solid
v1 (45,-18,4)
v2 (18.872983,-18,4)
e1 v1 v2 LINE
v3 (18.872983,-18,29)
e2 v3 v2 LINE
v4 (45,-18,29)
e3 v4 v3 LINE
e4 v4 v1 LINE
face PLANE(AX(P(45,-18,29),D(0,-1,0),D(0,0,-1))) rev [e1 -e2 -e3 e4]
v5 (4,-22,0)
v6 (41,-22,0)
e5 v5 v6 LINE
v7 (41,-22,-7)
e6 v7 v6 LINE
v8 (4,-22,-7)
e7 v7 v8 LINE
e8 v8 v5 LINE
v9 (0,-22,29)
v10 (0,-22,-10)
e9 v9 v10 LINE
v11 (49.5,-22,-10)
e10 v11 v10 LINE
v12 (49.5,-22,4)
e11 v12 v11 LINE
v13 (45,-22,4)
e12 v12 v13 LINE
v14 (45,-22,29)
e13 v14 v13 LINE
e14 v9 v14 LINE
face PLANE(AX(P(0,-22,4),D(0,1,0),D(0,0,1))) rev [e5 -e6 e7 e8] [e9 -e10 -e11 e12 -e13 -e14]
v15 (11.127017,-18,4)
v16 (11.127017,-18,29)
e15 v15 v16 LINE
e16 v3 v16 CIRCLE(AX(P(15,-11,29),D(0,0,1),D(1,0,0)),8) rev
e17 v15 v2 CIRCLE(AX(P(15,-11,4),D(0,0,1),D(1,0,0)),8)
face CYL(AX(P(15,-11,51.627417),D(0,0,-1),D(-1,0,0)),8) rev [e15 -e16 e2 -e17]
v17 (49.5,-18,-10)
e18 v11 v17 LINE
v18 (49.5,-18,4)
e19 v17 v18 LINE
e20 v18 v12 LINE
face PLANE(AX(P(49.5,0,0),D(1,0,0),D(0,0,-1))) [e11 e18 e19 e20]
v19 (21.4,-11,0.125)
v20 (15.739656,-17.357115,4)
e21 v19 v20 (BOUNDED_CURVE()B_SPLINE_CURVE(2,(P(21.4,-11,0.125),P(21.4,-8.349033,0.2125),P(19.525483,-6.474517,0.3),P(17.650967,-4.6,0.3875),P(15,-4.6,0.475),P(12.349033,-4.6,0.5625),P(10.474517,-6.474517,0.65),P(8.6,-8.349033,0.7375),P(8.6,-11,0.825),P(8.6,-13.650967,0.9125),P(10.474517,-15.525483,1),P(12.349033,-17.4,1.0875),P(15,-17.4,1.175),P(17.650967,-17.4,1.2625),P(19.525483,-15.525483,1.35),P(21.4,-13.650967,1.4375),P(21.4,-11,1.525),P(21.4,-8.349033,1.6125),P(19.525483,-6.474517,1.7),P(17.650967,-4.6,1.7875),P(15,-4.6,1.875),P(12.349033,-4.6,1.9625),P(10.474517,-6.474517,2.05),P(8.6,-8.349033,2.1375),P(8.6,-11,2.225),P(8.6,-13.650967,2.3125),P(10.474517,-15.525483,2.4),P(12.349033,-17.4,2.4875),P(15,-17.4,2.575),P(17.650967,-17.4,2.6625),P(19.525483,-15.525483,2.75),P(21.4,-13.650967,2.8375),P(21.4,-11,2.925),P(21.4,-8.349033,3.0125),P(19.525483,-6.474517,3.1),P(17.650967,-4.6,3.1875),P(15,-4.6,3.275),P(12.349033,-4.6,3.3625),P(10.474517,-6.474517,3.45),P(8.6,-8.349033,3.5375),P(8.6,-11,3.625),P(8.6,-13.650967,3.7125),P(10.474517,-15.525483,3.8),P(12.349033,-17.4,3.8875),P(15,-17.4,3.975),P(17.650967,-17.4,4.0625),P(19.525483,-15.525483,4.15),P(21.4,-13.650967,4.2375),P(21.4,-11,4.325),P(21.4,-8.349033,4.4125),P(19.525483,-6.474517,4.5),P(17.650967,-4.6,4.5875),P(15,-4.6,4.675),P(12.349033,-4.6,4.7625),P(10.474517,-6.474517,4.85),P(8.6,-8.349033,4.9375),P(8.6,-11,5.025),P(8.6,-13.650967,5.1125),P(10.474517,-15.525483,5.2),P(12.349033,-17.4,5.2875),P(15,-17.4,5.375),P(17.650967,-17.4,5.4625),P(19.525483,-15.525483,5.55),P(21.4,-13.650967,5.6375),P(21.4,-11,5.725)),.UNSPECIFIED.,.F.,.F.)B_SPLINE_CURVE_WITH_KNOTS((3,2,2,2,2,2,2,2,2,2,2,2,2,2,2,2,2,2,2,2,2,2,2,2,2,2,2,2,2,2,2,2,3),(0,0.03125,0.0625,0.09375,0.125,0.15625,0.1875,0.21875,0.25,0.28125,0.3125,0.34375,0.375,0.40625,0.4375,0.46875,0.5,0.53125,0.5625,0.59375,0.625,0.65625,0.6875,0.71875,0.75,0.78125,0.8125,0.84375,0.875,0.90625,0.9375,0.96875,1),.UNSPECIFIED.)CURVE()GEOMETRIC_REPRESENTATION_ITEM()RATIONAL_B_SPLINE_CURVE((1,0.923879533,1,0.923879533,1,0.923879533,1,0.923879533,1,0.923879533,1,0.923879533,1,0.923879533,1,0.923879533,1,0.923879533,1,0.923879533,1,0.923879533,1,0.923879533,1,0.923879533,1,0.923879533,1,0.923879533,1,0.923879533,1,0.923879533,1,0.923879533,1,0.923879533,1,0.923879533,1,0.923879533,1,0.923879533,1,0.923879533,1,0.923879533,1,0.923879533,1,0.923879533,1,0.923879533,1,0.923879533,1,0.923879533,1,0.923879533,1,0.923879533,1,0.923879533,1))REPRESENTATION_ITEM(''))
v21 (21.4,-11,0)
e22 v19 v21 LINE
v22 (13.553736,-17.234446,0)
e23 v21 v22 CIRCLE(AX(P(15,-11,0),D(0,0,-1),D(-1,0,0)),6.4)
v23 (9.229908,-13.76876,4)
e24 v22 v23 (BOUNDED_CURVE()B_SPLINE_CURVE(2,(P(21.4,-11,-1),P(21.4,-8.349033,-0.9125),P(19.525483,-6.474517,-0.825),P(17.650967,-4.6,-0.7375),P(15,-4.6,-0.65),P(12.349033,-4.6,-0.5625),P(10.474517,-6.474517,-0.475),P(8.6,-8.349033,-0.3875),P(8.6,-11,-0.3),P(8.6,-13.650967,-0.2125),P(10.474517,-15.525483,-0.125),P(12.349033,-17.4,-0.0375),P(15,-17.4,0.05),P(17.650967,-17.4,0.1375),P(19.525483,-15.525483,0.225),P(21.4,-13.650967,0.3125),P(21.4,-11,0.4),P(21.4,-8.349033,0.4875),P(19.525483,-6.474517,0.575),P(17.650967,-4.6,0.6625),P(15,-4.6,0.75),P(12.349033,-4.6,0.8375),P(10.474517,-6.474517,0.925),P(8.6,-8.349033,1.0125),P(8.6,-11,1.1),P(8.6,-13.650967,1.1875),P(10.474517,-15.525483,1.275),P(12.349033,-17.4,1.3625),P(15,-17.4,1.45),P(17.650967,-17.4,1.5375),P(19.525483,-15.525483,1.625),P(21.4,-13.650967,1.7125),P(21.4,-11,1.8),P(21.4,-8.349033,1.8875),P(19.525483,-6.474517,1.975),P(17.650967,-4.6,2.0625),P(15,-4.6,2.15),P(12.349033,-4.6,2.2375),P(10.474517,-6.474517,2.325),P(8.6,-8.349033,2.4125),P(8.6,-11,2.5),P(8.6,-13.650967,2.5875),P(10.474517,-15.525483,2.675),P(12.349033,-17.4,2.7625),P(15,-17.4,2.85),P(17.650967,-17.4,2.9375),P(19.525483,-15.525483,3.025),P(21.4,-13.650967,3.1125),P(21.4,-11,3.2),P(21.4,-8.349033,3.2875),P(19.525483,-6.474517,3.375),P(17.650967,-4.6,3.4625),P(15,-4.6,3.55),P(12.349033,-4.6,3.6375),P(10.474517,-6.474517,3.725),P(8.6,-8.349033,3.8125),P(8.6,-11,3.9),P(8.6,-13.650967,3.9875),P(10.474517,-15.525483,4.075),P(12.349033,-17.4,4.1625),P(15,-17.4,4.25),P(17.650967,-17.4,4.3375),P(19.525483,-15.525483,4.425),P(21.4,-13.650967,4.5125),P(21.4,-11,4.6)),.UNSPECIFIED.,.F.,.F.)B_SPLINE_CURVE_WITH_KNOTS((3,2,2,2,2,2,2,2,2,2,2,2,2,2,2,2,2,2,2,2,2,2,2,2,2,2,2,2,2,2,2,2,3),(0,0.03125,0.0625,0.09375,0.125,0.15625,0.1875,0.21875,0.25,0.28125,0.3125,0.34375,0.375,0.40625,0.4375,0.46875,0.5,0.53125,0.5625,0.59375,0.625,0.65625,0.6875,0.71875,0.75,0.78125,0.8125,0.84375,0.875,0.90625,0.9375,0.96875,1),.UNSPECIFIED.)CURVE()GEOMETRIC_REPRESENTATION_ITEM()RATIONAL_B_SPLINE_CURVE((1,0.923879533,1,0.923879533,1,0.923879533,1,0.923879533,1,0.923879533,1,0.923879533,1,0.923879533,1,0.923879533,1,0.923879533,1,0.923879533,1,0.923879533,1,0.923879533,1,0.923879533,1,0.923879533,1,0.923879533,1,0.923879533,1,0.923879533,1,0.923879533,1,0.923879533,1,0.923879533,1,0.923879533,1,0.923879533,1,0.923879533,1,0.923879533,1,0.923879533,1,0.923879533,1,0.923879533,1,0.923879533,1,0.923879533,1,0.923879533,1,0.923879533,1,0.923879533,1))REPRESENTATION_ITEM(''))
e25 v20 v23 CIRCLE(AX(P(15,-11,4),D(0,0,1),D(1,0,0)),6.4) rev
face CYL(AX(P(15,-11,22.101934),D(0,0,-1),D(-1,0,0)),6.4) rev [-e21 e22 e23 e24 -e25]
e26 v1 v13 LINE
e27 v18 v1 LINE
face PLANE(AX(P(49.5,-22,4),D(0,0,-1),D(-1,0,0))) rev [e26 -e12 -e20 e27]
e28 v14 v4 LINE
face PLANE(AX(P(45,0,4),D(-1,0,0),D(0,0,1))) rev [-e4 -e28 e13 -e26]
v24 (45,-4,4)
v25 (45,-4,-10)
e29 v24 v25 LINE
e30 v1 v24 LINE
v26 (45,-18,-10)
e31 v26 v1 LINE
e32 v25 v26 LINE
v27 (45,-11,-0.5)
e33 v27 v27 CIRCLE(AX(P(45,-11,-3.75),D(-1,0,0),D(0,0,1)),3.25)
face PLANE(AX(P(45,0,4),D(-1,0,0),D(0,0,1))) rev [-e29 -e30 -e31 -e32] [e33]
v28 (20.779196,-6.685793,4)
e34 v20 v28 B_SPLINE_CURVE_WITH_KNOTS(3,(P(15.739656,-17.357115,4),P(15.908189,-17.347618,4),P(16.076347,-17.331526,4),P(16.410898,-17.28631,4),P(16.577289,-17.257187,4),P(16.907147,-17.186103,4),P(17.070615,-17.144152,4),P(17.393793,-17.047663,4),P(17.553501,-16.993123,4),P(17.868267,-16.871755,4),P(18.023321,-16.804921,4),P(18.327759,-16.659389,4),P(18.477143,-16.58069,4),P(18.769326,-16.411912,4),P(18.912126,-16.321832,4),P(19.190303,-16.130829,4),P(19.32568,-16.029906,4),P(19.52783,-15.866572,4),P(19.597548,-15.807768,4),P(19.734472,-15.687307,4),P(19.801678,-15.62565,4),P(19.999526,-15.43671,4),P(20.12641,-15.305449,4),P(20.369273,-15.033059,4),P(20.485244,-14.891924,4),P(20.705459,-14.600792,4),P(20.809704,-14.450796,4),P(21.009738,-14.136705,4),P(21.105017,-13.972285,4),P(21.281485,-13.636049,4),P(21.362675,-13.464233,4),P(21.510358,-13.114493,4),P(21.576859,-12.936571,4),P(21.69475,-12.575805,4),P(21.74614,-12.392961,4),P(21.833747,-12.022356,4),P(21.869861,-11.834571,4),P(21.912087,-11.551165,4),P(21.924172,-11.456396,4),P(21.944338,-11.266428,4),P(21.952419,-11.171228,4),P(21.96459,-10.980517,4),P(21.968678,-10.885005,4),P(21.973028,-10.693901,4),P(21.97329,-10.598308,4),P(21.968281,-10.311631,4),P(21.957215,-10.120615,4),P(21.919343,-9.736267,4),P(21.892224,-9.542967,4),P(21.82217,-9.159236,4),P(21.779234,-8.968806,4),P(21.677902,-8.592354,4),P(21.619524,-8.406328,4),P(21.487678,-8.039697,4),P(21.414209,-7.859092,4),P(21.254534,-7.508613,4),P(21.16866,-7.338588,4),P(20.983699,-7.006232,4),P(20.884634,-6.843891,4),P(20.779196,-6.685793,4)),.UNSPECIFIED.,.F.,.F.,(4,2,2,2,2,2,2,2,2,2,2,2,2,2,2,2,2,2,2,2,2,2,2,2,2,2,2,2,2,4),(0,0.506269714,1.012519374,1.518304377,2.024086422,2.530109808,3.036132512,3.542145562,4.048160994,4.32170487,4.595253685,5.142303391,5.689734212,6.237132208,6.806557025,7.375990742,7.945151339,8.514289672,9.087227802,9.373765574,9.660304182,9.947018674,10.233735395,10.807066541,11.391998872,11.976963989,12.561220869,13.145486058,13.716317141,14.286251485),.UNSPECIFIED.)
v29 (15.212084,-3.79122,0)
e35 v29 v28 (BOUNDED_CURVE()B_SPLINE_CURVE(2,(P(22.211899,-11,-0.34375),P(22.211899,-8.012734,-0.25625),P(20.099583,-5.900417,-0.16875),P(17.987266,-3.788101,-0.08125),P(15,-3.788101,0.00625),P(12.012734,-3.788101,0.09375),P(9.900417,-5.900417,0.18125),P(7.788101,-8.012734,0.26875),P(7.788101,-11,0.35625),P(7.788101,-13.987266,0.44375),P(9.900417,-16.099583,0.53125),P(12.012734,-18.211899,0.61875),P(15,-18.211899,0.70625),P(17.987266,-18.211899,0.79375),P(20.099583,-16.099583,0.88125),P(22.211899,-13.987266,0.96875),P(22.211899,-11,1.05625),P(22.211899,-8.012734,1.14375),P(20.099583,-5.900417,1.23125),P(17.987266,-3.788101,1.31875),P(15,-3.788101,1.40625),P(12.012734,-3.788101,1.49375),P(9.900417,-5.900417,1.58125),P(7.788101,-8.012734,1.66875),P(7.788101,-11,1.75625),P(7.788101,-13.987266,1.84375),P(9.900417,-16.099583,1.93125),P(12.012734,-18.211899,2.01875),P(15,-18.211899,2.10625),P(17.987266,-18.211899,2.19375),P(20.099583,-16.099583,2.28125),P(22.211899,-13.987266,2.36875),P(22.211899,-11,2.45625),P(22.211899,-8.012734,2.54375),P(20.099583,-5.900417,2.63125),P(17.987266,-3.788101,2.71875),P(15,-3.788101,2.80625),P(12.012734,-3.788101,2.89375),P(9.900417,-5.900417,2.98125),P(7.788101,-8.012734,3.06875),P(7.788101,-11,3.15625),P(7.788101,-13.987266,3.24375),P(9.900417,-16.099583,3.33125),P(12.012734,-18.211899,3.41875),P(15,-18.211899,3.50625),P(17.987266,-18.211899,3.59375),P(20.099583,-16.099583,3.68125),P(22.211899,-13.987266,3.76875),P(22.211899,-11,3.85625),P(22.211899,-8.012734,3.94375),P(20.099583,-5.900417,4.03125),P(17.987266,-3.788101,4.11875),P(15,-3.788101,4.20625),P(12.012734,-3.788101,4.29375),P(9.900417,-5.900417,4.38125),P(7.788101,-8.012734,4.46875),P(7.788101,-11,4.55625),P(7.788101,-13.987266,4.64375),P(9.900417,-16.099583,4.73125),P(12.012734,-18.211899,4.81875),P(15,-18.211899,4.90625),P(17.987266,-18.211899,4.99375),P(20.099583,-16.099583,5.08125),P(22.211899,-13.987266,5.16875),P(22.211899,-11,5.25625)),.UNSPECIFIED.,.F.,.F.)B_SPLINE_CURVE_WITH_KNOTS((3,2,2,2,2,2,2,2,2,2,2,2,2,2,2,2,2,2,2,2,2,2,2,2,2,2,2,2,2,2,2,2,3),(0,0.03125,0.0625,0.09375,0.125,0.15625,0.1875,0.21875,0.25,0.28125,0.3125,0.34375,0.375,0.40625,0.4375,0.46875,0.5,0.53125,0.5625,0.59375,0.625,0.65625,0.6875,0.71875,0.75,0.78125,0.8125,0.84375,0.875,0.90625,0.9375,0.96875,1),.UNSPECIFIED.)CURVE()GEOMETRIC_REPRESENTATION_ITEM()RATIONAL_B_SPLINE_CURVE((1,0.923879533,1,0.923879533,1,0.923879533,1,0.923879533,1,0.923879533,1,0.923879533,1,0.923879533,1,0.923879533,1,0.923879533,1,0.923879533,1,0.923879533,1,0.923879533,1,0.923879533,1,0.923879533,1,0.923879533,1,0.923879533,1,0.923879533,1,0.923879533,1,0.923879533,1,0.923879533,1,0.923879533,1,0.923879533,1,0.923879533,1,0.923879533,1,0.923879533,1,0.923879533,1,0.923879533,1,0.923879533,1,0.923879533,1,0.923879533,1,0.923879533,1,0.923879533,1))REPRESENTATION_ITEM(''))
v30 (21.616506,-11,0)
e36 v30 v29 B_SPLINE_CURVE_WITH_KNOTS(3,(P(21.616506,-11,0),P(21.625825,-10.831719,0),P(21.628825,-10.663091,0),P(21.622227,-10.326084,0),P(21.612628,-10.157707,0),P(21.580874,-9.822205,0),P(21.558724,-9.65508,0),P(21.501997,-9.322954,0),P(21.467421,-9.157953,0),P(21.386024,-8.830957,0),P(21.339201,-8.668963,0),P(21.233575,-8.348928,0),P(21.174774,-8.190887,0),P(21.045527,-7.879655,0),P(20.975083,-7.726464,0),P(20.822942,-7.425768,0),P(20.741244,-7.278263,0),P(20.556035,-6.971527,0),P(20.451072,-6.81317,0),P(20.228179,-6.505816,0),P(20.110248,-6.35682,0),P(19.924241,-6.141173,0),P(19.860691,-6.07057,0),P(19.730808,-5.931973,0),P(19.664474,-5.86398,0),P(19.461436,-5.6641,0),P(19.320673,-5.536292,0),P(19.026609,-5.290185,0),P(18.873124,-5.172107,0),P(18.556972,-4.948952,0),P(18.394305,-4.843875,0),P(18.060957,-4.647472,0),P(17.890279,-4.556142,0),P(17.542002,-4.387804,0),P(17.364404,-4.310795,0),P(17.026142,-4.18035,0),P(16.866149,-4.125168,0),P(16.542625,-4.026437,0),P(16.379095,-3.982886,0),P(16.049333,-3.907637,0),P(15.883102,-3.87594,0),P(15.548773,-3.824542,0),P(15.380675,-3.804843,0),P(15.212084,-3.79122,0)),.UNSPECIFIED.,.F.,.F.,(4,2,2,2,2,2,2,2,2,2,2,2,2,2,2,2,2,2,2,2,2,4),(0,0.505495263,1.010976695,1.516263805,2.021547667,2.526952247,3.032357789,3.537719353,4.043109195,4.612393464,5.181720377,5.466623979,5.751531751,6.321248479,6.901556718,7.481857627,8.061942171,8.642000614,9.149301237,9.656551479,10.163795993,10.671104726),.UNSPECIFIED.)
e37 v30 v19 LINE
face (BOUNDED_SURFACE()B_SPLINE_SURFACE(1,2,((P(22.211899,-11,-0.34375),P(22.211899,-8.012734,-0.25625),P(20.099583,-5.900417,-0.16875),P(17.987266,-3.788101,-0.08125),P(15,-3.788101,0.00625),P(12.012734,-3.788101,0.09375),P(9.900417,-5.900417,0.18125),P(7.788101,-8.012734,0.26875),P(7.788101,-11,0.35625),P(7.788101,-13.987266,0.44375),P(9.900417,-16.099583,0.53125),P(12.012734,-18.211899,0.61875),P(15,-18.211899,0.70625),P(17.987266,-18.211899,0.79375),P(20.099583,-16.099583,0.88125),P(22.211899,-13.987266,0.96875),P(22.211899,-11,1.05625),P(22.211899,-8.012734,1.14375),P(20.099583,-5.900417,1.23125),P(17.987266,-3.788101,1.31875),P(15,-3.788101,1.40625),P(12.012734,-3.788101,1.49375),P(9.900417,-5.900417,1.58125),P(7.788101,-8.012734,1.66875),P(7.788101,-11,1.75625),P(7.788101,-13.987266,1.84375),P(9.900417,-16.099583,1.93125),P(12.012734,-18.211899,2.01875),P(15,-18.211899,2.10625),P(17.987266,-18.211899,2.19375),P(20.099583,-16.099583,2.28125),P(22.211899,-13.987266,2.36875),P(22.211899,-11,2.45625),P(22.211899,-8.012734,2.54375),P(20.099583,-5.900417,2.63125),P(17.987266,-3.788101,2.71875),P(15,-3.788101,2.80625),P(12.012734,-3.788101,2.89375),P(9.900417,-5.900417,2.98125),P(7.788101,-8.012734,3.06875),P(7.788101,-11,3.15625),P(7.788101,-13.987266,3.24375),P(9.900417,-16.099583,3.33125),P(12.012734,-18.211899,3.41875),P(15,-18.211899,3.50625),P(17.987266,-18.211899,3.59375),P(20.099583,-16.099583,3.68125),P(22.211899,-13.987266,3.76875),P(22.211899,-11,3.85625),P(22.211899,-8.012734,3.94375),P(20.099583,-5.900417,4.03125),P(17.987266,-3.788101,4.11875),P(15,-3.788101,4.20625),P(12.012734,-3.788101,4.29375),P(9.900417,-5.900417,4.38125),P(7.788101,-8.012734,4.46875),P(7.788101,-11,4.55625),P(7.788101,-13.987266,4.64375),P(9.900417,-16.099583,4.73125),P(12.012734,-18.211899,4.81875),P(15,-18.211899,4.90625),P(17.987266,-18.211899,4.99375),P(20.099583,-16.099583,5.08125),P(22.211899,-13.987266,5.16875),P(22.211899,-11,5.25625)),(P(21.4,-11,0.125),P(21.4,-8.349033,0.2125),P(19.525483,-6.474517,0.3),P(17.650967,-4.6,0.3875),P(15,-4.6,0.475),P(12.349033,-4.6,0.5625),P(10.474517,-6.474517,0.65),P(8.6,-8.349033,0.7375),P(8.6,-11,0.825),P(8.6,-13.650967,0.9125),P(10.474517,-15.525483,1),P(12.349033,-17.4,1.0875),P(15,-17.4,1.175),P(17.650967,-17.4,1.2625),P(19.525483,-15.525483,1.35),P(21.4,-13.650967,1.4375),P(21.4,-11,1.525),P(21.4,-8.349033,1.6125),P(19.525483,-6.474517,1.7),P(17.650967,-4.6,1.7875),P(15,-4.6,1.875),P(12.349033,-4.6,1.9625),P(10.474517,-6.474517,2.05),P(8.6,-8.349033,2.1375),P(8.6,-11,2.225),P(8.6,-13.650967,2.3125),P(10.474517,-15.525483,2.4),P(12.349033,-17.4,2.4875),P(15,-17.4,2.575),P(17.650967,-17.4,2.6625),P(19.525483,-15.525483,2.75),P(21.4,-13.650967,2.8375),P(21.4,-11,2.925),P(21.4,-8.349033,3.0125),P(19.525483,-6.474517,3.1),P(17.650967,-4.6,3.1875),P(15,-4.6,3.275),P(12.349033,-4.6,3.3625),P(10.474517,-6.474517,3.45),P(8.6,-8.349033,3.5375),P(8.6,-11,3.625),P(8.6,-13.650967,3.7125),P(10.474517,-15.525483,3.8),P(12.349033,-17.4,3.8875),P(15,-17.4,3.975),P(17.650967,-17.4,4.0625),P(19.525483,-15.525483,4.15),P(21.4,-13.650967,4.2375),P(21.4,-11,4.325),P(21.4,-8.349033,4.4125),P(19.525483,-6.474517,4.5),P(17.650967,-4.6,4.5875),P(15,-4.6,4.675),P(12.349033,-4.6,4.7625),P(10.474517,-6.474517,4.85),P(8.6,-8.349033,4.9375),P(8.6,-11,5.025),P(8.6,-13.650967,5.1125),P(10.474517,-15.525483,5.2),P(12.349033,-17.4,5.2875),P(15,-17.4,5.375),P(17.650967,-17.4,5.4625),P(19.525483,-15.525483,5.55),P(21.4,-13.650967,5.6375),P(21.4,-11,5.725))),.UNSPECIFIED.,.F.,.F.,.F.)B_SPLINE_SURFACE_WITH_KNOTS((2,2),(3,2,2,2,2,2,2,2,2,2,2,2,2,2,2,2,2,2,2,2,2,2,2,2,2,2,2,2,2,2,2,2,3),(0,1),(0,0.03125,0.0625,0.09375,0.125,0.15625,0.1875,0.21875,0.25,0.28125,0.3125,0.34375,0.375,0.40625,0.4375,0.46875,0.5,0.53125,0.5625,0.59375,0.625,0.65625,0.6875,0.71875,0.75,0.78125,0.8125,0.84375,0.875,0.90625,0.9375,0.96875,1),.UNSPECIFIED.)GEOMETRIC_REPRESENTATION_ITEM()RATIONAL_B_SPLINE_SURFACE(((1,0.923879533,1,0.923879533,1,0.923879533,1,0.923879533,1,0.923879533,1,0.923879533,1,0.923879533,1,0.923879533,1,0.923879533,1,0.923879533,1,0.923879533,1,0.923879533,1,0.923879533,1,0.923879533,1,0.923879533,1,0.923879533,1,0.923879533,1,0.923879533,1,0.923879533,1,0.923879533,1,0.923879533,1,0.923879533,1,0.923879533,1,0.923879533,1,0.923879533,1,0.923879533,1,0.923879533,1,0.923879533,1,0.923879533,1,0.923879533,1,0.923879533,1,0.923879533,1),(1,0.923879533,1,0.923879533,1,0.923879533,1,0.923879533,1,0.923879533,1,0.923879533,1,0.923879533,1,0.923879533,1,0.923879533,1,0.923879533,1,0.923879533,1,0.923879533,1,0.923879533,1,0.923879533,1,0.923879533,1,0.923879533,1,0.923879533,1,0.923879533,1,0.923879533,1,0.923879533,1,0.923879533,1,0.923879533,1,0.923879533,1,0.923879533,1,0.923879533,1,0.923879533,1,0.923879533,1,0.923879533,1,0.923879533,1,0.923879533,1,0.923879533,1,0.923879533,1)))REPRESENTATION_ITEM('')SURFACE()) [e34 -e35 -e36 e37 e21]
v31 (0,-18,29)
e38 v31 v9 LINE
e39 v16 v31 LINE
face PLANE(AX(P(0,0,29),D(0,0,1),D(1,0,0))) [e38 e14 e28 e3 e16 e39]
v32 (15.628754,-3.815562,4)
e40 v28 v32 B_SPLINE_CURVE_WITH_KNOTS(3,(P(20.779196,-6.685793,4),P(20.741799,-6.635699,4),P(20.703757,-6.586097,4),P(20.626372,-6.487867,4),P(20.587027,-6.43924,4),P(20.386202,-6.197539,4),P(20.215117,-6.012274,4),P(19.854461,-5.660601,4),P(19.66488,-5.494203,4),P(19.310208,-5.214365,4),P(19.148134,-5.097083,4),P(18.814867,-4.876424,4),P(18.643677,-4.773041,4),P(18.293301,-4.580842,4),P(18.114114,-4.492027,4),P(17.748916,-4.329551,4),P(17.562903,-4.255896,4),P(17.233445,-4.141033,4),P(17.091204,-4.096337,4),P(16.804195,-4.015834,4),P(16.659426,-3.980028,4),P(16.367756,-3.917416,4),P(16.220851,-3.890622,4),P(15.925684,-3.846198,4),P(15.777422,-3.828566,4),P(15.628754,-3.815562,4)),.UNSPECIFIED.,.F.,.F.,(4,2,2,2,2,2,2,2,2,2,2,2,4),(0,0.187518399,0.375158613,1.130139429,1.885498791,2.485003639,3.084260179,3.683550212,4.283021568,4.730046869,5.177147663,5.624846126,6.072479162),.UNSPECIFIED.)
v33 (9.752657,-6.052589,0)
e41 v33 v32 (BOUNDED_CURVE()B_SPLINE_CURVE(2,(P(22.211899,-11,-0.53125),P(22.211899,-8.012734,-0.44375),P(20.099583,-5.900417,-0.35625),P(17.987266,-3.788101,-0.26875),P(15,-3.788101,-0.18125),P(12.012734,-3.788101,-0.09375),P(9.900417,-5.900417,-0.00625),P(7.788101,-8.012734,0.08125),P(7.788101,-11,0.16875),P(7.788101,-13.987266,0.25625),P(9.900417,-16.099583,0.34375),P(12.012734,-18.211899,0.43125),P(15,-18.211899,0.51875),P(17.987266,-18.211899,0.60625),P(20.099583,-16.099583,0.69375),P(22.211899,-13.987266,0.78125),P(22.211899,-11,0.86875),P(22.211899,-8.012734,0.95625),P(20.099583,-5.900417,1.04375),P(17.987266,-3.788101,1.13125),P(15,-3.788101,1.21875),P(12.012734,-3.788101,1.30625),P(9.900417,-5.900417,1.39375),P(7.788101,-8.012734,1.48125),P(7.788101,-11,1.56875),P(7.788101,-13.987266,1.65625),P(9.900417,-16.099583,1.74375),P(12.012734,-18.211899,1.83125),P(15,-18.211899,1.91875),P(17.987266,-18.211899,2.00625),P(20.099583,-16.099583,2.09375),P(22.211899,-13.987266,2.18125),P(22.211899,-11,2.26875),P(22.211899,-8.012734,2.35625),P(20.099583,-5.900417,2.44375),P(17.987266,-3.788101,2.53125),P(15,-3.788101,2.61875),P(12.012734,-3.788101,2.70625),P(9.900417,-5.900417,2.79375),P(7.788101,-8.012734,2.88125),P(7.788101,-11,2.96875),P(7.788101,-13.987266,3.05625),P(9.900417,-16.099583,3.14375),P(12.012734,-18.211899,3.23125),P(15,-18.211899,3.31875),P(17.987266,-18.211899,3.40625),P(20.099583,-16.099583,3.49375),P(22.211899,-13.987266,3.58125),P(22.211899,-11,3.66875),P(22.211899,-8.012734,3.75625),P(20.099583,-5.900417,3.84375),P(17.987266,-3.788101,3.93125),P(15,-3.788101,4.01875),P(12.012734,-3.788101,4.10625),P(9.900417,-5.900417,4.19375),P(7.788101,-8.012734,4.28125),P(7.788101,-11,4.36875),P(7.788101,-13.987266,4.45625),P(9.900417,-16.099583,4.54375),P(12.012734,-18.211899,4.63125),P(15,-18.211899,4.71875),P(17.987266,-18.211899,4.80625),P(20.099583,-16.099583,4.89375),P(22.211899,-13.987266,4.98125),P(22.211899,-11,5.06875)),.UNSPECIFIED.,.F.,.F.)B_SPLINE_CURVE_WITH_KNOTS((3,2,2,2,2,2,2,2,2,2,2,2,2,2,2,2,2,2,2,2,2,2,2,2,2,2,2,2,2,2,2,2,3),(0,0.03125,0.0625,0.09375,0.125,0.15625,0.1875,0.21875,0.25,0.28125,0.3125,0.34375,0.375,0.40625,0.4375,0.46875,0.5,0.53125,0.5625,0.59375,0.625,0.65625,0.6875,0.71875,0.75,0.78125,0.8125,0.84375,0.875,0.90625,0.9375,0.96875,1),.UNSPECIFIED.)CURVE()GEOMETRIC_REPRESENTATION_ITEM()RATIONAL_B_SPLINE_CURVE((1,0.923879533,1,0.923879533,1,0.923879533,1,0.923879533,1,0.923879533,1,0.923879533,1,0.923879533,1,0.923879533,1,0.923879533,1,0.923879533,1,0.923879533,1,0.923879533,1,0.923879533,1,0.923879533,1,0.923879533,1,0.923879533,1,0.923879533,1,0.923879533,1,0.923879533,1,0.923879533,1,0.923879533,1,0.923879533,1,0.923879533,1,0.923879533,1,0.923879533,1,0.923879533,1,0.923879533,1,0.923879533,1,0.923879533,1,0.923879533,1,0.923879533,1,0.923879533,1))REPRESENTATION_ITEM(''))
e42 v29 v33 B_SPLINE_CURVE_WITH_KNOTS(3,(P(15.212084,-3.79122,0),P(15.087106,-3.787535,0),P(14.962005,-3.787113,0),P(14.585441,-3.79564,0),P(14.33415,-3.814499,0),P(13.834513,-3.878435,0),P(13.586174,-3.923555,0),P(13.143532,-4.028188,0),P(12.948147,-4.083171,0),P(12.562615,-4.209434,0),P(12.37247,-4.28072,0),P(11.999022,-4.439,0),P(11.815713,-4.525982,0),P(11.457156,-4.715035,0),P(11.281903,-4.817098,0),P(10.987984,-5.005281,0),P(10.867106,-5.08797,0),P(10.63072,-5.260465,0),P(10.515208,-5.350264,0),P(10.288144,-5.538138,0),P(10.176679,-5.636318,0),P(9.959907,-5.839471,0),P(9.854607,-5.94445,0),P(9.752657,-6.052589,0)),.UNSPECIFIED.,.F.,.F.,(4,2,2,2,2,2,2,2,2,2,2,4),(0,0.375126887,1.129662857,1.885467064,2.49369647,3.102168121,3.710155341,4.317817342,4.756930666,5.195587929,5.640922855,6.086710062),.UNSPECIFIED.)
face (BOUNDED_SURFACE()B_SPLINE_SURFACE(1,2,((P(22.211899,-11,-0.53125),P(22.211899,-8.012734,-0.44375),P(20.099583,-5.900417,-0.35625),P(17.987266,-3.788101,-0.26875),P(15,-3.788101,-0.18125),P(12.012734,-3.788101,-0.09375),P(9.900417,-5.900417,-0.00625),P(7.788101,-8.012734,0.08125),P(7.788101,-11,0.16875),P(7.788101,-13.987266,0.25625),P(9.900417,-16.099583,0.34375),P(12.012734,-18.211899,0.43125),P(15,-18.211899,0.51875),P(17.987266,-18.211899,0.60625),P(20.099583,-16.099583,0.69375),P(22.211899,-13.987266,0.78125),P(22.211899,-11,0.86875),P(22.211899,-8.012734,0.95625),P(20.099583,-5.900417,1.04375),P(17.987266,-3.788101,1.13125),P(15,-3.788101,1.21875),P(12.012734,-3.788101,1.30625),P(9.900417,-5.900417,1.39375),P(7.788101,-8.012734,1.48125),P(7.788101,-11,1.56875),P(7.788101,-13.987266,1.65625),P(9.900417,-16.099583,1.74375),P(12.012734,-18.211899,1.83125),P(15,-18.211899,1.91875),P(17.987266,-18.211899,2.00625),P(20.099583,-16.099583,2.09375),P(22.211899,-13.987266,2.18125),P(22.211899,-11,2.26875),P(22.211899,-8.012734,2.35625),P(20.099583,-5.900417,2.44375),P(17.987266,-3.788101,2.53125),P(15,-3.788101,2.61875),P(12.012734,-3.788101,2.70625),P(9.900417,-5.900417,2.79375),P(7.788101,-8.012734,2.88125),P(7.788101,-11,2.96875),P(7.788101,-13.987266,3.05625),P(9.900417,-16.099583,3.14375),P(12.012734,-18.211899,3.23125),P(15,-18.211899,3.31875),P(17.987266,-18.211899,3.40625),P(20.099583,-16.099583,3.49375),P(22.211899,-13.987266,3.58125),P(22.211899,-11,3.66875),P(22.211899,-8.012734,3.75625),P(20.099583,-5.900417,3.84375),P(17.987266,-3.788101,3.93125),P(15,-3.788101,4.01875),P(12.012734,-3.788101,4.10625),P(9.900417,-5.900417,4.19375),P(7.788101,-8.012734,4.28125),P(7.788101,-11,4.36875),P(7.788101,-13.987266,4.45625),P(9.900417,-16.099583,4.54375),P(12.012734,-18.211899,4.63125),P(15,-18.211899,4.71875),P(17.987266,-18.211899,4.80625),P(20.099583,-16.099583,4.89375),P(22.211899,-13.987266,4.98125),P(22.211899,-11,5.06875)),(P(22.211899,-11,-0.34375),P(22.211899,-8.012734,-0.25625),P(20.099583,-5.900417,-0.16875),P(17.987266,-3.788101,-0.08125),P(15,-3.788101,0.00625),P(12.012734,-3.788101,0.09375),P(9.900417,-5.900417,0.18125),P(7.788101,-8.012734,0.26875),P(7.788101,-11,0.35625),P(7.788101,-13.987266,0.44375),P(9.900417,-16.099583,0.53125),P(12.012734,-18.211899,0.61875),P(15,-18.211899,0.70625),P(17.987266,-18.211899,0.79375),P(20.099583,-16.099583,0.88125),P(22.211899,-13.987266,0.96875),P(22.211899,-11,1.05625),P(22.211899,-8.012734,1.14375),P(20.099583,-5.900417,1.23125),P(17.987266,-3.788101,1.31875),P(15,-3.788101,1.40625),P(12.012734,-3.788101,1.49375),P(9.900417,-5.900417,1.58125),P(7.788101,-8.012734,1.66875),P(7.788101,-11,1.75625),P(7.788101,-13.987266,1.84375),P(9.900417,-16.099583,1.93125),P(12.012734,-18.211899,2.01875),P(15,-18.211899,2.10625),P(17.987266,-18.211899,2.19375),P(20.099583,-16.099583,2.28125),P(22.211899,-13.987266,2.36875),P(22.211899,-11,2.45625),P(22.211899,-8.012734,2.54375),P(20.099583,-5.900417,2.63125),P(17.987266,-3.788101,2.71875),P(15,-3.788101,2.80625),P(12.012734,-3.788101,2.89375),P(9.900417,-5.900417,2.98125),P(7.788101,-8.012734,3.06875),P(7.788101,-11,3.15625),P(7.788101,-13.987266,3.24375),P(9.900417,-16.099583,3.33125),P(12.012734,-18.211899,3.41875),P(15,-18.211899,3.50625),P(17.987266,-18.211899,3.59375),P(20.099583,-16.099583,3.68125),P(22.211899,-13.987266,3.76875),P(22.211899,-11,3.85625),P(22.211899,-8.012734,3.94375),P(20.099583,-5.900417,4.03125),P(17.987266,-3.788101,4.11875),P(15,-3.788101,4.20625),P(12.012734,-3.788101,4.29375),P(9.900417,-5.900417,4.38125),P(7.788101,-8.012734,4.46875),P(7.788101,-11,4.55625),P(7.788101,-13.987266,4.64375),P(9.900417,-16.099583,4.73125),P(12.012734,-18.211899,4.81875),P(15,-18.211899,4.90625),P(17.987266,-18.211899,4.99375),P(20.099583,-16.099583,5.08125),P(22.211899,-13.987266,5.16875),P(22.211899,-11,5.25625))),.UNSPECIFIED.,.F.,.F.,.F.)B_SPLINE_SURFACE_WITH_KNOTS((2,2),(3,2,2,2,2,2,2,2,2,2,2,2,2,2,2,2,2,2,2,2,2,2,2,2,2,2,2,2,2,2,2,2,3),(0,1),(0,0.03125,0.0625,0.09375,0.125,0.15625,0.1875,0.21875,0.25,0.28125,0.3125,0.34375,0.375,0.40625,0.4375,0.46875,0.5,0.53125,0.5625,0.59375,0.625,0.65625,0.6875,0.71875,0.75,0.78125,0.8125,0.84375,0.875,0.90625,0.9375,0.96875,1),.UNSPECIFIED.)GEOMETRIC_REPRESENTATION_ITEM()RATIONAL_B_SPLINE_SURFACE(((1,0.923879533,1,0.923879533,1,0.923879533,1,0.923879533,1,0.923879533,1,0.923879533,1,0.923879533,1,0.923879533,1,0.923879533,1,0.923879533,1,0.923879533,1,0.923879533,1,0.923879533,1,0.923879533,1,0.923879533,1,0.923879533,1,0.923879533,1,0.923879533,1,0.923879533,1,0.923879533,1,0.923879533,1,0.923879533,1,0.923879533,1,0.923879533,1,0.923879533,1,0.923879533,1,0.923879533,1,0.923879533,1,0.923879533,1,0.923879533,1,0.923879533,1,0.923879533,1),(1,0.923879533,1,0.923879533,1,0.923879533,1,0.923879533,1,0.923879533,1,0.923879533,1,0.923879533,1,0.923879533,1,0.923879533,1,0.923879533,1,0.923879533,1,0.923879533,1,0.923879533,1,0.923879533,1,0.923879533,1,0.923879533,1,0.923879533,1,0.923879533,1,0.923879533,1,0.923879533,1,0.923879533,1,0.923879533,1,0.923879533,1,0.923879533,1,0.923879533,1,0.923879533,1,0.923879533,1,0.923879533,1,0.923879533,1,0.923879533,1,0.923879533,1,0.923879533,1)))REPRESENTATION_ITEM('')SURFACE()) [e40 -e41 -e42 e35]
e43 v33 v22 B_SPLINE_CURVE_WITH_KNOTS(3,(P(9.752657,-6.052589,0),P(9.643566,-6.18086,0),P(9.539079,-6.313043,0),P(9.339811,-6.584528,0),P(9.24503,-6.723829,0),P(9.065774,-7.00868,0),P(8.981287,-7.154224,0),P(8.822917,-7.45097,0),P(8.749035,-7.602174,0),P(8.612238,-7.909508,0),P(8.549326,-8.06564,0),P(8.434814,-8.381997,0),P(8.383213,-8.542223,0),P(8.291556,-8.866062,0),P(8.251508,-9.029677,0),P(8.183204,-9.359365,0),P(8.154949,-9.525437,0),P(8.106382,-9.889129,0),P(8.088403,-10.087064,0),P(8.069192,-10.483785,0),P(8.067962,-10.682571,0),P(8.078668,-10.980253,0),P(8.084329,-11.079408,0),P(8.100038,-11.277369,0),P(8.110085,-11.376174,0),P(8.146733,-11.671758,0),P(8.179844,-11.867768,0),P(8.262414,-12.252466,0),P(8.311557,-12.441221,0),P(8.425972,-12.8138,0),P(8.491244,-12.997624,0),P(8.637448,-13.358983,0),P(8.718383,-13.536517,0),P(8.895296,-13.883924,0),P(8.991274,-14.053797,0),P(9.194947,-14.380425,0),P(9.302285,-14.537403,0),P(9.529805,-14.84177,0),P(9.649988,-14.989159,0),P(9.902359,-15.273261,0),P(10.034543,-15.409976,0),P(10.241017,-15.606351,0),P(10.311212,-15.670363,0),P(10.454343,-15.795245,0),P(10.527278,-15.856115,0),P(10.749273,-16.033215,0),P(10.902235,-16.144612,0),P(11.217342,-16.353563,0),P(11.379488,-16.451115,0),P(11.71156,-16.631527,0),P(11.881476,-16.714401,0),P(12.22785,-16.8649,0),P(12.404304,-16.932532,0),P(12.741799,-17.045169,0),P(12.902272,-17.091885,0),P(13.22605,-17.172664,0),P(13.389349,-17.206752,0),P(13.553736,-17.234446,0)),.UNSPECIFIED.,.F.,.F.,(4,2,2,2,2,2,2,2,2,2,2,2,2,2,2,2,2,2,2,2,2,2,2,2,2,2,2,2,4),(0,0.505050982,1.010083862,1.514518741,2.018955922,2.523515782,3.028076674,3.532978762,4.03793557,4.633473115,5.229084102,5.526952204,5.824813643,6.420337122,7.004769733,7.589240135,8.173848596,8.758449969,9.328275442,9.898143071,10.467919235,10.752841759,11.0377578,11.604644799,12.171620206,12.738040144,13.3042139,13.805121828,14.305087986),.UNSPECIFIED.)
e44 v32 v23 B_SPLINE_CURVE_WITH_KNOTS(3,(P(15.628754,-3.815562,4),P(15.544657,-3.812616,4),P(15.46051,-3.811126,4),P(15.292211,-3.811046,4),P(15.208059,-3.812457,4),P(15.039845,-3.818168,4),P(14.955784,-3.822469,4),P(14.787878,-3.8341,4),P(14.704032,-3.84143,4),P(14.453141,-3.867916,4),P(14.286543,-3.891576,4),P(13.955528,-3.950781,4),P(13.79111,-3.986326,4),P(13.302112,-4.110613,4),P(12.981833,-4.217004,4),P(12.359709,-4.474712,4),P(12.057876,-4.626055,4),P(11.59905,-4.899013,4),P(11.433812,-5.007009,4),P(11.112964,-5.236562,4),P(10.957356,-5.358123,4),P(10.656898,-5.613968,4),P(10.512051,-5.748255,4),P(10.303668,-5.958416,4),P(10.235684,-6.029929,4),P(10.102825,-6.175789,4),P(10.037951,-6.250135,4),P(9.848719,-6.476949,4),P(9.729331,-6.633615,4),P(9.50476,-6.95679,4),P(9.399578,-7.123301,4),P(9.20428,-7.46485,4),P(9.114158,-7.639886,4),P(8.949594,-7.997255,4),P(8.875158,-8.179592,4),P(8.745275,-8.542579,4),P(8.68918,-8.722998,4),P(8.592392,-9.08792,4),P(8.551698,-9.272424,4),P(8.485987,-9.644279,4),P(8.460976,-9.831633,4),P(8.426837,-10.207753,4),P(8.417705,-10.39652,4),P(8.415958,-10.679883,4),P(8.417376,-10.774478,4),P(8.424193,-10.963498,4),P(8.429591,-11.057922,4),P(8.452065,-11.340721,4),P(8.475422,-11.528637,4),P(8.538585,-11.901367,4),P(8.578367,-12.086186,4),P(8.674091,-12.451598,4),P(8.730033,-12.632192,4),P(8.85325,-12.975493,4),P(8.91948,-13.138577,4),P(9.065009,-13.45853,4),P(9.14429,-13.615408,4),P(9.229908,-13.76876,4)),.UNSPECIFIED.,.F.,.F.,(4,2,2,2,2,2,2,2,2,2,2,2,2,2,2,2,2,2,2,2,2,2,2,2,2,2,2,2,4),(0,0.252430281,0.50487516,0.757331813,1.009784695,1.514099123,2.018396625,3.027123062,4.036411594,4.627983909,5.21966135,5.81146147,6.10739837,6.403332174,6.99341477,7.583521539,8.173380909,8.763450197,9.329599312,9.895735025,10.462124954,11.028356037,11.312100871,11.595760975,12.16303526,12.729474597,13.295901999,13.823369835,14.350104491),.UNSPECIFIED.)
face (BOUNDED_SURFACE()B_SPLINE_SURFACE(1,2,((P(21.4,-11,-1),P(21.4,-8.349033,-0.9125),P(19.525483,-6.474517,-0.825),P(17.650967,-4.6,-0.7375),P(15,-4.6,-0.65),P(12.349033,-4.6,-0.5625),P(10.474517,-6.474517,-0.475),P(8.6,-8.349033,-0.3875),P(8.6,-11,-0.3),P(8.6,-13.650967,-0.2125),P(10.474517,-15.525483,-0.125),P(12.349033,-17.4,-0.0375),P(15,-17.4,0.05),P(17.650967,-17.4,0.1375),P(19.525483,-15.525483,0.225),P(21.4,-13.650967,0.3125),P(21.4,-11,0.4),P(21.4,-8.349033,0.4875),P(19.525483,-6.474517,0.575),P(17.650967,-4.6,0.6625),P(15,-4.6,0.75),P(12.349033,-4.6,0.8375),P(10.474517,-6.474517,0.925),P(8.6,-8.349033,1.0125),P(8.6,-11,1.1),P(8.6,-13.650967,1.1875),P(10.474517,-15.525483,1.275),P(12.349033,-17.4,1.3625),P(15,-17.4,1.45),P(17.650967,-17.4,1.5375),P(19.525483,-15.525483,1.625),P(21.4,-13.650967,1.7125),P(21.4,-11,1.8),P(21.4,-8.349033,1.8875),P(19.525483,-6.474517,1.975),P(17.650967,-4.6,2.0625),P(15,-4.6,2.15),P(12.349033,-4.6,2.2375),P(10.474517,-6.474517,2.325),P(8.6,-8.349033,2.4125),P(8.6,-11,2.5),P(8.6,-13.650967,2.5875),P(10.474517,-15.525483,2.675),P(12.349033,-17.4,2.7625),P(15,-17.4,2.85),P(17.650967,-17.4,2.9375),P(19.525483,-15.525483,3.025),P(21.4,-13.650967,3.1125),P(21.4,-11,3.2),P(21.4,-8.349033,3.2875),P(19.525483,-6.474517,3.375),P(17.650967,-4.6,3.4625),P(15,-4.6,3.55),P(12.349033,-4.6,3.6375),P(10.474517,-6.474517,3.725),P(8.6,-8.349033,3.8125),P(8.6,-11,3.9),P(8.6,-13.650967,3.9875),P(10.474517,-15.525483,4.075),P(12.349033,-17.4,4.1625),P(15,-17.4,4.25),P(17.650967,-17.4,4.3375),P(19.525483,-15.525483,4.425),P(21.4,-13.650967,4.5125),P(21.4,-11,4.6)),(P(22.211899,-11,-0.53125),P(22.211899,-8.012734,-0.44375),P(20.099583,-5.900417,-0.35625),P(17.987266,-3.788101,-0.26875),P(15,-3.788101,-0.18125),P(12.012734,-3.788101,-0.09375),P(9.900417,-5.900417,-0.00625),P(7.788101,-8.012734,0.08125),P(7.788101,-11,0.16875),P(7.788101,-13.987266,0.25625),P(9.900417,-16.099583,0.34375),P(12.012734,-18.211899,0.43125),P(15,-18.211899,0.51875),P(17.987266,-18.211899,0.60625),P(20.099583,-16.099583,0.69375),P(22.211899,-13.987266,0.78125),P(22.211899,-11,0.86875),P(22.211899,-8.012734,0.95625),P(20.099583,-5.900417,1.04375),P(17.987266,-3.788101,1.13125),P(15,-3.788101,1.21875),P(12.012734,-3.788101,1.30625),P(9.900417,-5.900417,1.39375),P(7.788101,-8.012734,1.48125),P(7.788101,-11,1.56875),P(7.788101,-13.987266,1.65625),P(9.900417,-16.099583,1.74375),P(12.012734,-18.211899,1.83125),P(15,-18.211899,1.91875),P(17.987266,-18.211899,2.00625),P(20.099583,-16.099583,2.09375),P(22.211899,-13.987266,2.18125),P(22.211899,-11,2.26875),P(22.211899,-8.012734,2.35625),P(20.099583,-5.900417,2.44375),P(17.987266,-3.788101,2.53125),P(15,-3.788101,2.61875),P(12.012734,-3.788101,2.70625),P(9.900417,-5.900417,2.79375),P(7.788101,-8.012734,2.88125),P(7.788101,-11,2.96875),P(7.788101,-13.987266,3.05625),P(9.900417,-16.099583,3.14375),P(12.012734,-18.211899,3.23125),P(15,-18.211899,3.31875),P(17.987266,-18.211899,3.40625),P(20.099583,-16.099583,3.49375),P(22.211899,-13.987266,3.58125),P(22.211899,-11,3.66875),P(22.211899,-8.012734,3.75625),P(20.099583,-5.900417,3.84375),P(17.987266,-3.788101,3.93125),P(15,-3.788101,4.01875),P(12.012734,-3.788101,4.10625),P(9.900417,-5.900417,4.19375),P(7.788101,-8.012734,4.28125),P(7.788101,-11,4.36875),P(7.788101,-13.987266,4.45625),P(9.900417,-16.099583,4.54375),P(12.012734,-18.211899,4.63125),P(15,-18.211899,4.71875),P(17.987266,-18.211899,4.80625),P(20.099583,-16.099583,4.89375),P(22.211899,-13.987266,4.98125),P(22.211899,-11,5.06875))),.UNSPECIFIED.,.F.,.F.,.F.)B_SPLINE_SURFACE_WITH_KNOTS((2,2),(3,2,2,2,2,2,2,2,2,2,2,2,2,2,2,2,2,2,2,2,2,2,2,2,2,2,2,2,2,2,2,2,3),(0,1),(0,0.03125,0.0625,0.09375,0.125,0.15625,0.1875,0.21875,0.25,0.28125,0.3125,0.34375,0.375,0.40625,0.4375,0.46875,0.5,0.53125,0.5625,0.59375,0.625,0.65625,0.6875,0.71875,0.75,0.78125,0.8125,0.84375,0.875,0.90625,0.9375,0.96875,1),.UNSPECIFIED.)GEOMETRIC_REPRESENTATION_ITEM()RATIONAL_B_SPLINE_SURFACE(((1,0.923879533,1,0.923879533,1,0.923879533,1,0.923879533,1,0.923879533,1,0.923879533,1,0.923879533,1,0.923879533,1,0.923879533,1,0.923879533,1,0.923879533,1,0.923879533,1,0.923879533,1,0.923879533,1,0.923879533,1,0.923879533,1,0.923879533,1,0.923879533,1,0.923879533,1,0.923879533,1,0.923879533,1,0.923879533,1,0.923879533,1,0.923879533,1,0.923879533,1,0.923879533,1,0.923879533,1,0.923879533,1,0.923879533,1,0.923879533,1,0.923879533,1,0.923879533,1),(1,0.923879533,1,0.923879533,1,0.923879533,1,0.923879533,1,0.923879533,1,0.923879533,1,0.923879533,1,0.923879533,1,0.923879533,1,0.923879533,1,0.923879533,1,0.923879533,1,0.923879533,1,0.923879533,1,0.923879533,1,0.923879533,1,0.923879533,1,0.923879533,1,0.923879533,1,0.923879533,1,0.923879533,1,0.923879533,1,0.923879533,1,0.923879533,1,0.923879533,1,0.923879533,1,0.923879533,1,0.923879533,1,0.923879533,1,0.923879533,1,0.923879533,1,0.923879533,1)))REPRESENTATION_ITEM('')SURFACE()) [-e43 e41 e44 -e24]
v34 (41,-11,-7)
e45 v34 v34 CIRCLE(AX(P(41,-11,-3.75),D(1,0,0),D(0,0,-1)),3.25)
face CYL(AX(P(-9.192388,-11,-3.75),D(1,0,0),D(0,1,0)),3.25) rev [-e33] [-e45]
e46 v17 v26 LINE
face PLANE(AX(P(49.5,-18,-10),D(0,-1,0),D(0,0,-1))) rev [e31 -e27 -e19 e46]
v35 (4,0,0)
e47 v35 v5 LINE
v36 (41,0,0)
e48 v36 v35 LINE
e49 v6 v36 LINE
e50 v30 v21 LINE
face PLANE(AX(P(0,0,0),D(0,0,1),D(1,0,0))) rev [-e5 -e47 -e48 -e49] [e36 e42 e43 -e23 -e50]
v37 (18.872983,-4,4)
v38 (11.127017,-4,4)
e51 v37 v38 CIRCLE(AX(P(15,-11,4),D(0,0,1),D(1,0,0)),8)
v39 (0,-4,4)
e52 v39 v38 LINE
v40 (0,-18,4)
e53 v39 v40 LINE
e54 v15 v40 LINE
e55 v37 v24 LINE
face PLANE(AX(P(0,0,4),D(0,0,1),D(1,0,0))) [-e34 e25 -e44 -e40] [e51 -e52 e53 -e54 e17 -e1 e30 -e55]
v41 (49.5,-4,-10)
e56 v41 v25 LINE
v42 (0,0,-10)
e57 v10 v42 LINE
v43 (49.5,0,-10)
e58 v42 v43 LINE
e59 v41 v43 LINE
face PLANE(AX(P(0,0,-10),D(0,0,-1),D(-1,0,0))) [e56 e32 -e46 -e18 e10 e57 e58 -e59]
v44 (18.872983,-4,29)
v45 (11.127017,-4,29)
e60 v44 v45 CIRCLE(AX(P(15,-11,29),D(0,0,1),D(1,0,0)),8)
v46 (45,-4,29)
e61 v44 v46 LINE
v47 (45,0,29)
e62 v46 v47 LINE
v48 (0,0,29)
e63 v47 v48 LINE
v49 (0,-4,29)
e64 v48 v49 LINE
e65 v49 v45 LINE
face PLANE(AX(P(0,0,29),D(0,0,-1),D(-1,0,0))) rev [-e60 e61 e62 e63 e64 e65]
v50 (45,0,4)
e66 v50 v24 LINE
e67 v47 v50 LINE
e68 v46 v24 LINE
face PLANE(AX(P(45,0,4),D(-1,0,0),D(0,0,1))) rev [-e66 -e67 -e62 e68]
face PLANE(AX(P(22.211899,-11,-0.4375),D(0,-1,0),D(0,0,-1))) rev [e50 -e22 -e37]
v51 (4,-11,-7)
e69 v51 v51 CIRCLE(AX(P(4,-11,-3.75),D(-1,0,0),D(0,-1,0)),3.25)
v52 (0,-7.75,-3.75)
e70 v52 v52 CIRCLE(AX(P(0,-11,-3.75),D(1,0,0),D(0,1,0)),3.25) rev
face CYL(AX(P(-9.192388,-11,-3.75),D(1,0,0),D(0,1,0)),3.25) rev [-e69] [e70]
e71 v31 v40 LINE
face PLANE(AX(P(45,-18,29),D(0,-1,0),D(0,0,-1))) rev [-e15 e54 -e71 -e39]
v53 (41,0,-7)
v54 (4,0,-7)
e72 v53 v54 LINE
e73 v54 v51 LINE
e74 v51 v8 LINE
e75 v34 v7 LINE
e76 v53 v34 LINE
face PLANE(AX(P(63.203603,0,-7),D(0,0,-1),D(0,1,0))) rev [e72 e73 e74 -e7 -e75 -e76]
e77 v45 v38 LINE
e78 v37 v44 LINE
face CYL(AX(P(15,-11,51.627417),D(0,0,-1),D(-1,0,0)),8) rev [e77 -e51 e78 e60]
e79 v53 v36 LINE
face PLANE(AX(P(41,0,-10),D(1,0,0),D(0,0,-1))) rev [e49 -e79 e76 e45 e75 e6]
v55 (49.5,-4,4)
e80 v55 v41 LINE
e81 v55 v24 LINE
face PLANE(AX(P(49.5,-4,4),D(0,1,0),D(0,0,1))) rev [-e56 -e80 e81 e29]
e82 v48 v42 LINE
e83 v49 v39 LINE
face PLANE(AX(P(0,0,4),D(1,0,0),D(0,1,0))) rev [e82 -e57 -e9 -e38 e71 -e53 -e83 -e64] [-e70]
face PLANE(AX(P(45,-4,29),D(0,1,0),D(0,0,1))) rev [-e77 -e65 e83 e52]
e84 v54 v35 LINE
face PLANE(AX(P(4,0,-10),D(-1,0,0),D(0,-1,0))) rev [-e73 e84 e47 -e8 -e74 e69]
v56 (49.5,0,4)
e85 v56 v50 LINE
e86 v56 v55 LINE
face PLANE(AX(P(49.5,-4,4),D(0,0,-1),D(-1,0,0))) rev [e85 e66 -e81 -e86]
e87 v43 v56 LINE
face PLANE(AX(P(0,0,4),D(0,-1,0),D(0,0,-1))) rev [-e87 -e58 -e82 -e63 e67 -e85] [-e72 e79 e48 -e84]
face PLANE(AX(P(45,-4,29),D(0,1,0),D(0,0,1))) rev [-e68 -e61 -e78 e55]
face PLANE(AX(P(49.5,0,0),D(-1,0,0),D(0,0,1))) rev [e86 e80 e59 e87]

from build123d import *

# Parameters (mm, degrees)
ESQUISSE1_W                         = 45
ESQUISSE1_H                         = 22
BOSS_EXTRU_1_DEPTH                  = 4
ESQUISSE2_R                         = 6.4
ENL_V_MAT_EXTRU_1_DEPTH             = 4
FILETAGE1_PITCH                     = 1.4
ESQUISSE3_W                         = 4
ESQUISSE3_H                         = 22
BOSS_EXTRU_2_DEPTH                  = 10
ESQUISSE4_W                         = 3
ESQUISSE4_H                         = 22
BOSS_EXTRU_3_DEPTH                  = 37
ENL_V_MAT_EXTRU_2_REACH             = 49.592
ESQUISSE5_R                         = 3.25
ENL_V_MAT_EXTRU_2_DIRECTION_2_REACH = 49.592
ESQUISSE6_W                         = 45
ESQUISSE6_H                         = 4
BOSS_EXTRU_4_DEPTH                  = 25
ESQUISSE7_R                         = 8
ENL_V_MAT_EXTRU_4_DEPTH             = 25
ESQUISSE8_W                         = 14
ESQUISSE8_H                         = 4
BOSS_EXTRU_5_DEPTH                  = 4.5


with BuildPart() as part:
    # Esquisse1 → Boss.-Extru.1 (new body)
    with BuildSketch(Plane.XY):
        with Locations((22.5, -11)):
            Rectangle(ESQUISSE1_W, ESQUISSE1_H)
    extrude(amount=BOSS_EXTRU_1_DEPTH)

    # Esquisse2 → Enlèv. mat.-Extru.1 (cut)
    with BuildSketch(Plane(origin=(0, 0, 0), x_dir=(-1, 0, 0), z_dir=(0, 0, -1))):
        with Locations((-15, -11)):
            Circle(ESQUISSE2_R)
    extrude(amount=-ENL_V_MAT_EXTRU_1_DEPTH, mode=Mode.SUBTRACT)

    # Filetage1: the profile of Profil de filetage1 profile screwed along a right-hand helix of 4 turns, 8 arcs to a turn; built about Z, then put on its axis
    filetage1_z = Axis((0, 0, 0), (0, 0, 1))
    filetage1_corners = [(6.3997, 0, -0.000173205), (7.211898812, 0, 0.468749998), (7.211898812, 0, 0.656249998), (6.3997, 0, 1.125173201)]
    with BuildLine(mode=Mode.PRIVATE) as filetage1_profile:
        Line(filetage1_corners[0], filetage1_corners[1])
        Line(filetage1_corners[1], filetage1_corners[2])
        Line(filetage1_corners[2], filetage1_corners[3])
        Line(filetage1_corners[3], filetage1_corners[0])
    filetage1_cap = Face(filetage1_profile.wire())
    filetage1_turn_angles = [0, 22.5, 45, 67.5, 90, 112.5, 135, 157.5, 180, 202.5, 225, 247.5, 270, 292.5, 315, 337.5, 360]
    filetage1_turn_weights = [1, 0.9238795325112867, 1, 0.9238795325112867, 1, 0.9238795325112867, 1, 0.9238795325112867, 1, 0.9238795325112867, 1, 0.9238795325112867, 1, 0.9238795325112867, 1, 0.9238795325112867, 1]
    filetage1_turn_rails = [Edge.make_bspline([Vector(p[0], p[1], 0).rotate(filetage1_z, filetage1_turn_angles[k]) / filetage1_turn_weights[k] + Vector(0, 0, p[2] + FILETAGE1_PITCH * filetage1_turn_angles[k] / 360) for k in range(17)], [0, 0, 0, 1, 1, 2, 2, 3, 3, 4, 4, 5, 5, 6, 6, 7, 7, 8, 8, 8], 2, filetage1_turn_weights) for p in filetage1_corners]
    filetage1_turn_sides = [Face.make_surface_from_curves(filetage1_turn_rails[p[0]], filetage1_turn_rails[p[1]]) for p in [(0, 1), (1, 2), (2, 3), (3, 0)]]
    filetage1 = Plane(origin=(15, -11, -1), x_dir=(1, 0, 0), z_dir=(0, 0, 1)) * Solid(Shell([*[p.moved(Location((0, 0, FILETAGE1_PITCH * i))) for i in range(4) for p in filetage1_turn_sides], filetage1_cap, filetage1_cap.rotate(filetage1_z, 1440).moved(Location((0, 0, FILETAGE1_PITCH * 1440 / 360)))]))
    add(filetage1, mode=Mode.SUBTRACT)

    # Esquisse3 → Boss.-Extru.2 (add)
    with BuildSketch(Plane(origin=(0, 0, 0), x_dir=(-1, 0, 0), z_dir=(0, 0, -1))):
        with Locations((-43, -11)):
            Rectangle(ESQUISSE3_W, ESQUISSE3_H)
        with Locations((-2, -11)):
            Rectangle(ESQUISSE3_W, ESQUISSE3_H)
    extrude(amount=BOSS_EXTRU_2_DEPTH)

    # Esquisse4 → Boss.-Extru.3 (add)
    with BuildSketch(Plane(origin=(4, 0, 0), x_dir=(0, 0, -1), z_dir=(1, 0, 0))):
        with Locations((8.5, -11)):
            Rectangle(ESQUISSE4_W, ESQUISSE4_H)
    extrude(amount=BOSS_EXTRU_3_DEPTH)

    # Enlèv. mat.-Extru.2: up to this face of the body (flat: up to its plane)
    enl_v_mat_extru_2_end = Plane(part.part.faces().sort_by_distance((0, -11, -3))[0])
    # Esquisse5 → Enlèv. mat.-Extru.2 (cut, up to the picked face)
    with BuildSketch(Plane(origin=(4, 0, 0), x_dir=(0, 0, -1), z_dir=(1, 0, 0)), mode=Mode.PRIVATE) as enl_v_mat_extru_2_sk1:
        with Locations(Location((3.75, -11, 0), (0, 0, 180))):
            Circle(ESQUISSE5_R)
    enl_v_mat_extru_2_tool1 = split(extrude(enl_v_mat_extru_2_sk1.sketch, amount=-ENL_V_MAT_EXTRU_2_REACH, mode=Mode.PRIVATE), bisect_by=enl_v_mat_extru_2_end, keep=Keep.BOTH, mode=Mode.PRIVATE)
    add(enl_v_mat_extru_2_tool1.solids().sort_by(Axis((4, -11, -3.75), (-1, 0, 0)))[0], mode=Mode.SUBTRACT)

    # Enlèv. mat.-Extru.2 direction 2: up to this face of the body (flat: up to its plane)
    enl_v_mat_extru_2_direction_2_end = Plane(part.part.faces().sort_by_distance((45, -11, -3))[0])
    # Esquisse5 → Enlèv. mat.-Extru.2 direction 2 (cut, up to the picked face)
    with BuildSketch(Plane(origin=(4, 0, 0), x_dir=(0, 0, -1), z_dir=(1, 0, 0)), mode=Mode.PRIVATE) as enl_v_mat_extru_2_direction_2_sk1:
        with Locations(Location((3.75, -11, 0), (0, 0, 180))):
            Circle(ESQUISSE5_R)
    enl_v_mat_extru_2_direction_2_tool1 = split(extrude(enl_v_mat_extru_2_direction_2_sk1.sketch, amount=ENL_V_MAT_EXTRU_2_DIRECTION_2_REACH, mode=Mode.PRIVATE), bisect_by=enl_v_mat_extru_2_direction_2_end, keep=Keep.BOTH, mode=Mode.PRIVATE)
    add(enl_v_mat_extru_2_direction_2_tool1.solids().sort_by(Axis((4, -11, -3.75), (1, 0, 0)))[0], mode=Mode.SUBTRACT)

    # Esquisse6 → Boss.-Extru.4 (add)
    with BuildSketch(Plane.XY.offset(4)):
        with Locations((22.5, -2)):
            Rectangle(ESQUISSE6_W, ESQUISSE6_H)
        with Locations((22.5, -20)):
            Rectangle(ESQUISSE6_W, ESQUISSE6_H)
    extrude(amount=BOSS_EXTRU_4_DEPTH)

    # Esquisse7 → Enlèv. mat.-Extru.4 (cut)
    with BuildSketch(Plane.XY.offset(4)):
        with Locations((15, -11)):
            Circle(ESQUISSE7_R)
    extrude(amount=ENL_V_MAT_EXTRU_4_DEPTH, mode=Mode.SUBTRACT)

    # Esquisse8 → Boss.-Extru.5 (add)
    with BuildSketch(Plane(origin=(45, 0, 0), x_dir=(0, 0, -1), z_dir=(1, 0, 0))):
        with Locations((3, -20)):
            Rectangle(ESQUISSE8_W, ESQUISSE8_H)
        with Locations((3, -2)):
            Rectangle(ESQUISSE8_W, ESQUISSE8_H)
    extrude(amount=BOSS_EXTRU_5_DEPTH)


solid = part.part
